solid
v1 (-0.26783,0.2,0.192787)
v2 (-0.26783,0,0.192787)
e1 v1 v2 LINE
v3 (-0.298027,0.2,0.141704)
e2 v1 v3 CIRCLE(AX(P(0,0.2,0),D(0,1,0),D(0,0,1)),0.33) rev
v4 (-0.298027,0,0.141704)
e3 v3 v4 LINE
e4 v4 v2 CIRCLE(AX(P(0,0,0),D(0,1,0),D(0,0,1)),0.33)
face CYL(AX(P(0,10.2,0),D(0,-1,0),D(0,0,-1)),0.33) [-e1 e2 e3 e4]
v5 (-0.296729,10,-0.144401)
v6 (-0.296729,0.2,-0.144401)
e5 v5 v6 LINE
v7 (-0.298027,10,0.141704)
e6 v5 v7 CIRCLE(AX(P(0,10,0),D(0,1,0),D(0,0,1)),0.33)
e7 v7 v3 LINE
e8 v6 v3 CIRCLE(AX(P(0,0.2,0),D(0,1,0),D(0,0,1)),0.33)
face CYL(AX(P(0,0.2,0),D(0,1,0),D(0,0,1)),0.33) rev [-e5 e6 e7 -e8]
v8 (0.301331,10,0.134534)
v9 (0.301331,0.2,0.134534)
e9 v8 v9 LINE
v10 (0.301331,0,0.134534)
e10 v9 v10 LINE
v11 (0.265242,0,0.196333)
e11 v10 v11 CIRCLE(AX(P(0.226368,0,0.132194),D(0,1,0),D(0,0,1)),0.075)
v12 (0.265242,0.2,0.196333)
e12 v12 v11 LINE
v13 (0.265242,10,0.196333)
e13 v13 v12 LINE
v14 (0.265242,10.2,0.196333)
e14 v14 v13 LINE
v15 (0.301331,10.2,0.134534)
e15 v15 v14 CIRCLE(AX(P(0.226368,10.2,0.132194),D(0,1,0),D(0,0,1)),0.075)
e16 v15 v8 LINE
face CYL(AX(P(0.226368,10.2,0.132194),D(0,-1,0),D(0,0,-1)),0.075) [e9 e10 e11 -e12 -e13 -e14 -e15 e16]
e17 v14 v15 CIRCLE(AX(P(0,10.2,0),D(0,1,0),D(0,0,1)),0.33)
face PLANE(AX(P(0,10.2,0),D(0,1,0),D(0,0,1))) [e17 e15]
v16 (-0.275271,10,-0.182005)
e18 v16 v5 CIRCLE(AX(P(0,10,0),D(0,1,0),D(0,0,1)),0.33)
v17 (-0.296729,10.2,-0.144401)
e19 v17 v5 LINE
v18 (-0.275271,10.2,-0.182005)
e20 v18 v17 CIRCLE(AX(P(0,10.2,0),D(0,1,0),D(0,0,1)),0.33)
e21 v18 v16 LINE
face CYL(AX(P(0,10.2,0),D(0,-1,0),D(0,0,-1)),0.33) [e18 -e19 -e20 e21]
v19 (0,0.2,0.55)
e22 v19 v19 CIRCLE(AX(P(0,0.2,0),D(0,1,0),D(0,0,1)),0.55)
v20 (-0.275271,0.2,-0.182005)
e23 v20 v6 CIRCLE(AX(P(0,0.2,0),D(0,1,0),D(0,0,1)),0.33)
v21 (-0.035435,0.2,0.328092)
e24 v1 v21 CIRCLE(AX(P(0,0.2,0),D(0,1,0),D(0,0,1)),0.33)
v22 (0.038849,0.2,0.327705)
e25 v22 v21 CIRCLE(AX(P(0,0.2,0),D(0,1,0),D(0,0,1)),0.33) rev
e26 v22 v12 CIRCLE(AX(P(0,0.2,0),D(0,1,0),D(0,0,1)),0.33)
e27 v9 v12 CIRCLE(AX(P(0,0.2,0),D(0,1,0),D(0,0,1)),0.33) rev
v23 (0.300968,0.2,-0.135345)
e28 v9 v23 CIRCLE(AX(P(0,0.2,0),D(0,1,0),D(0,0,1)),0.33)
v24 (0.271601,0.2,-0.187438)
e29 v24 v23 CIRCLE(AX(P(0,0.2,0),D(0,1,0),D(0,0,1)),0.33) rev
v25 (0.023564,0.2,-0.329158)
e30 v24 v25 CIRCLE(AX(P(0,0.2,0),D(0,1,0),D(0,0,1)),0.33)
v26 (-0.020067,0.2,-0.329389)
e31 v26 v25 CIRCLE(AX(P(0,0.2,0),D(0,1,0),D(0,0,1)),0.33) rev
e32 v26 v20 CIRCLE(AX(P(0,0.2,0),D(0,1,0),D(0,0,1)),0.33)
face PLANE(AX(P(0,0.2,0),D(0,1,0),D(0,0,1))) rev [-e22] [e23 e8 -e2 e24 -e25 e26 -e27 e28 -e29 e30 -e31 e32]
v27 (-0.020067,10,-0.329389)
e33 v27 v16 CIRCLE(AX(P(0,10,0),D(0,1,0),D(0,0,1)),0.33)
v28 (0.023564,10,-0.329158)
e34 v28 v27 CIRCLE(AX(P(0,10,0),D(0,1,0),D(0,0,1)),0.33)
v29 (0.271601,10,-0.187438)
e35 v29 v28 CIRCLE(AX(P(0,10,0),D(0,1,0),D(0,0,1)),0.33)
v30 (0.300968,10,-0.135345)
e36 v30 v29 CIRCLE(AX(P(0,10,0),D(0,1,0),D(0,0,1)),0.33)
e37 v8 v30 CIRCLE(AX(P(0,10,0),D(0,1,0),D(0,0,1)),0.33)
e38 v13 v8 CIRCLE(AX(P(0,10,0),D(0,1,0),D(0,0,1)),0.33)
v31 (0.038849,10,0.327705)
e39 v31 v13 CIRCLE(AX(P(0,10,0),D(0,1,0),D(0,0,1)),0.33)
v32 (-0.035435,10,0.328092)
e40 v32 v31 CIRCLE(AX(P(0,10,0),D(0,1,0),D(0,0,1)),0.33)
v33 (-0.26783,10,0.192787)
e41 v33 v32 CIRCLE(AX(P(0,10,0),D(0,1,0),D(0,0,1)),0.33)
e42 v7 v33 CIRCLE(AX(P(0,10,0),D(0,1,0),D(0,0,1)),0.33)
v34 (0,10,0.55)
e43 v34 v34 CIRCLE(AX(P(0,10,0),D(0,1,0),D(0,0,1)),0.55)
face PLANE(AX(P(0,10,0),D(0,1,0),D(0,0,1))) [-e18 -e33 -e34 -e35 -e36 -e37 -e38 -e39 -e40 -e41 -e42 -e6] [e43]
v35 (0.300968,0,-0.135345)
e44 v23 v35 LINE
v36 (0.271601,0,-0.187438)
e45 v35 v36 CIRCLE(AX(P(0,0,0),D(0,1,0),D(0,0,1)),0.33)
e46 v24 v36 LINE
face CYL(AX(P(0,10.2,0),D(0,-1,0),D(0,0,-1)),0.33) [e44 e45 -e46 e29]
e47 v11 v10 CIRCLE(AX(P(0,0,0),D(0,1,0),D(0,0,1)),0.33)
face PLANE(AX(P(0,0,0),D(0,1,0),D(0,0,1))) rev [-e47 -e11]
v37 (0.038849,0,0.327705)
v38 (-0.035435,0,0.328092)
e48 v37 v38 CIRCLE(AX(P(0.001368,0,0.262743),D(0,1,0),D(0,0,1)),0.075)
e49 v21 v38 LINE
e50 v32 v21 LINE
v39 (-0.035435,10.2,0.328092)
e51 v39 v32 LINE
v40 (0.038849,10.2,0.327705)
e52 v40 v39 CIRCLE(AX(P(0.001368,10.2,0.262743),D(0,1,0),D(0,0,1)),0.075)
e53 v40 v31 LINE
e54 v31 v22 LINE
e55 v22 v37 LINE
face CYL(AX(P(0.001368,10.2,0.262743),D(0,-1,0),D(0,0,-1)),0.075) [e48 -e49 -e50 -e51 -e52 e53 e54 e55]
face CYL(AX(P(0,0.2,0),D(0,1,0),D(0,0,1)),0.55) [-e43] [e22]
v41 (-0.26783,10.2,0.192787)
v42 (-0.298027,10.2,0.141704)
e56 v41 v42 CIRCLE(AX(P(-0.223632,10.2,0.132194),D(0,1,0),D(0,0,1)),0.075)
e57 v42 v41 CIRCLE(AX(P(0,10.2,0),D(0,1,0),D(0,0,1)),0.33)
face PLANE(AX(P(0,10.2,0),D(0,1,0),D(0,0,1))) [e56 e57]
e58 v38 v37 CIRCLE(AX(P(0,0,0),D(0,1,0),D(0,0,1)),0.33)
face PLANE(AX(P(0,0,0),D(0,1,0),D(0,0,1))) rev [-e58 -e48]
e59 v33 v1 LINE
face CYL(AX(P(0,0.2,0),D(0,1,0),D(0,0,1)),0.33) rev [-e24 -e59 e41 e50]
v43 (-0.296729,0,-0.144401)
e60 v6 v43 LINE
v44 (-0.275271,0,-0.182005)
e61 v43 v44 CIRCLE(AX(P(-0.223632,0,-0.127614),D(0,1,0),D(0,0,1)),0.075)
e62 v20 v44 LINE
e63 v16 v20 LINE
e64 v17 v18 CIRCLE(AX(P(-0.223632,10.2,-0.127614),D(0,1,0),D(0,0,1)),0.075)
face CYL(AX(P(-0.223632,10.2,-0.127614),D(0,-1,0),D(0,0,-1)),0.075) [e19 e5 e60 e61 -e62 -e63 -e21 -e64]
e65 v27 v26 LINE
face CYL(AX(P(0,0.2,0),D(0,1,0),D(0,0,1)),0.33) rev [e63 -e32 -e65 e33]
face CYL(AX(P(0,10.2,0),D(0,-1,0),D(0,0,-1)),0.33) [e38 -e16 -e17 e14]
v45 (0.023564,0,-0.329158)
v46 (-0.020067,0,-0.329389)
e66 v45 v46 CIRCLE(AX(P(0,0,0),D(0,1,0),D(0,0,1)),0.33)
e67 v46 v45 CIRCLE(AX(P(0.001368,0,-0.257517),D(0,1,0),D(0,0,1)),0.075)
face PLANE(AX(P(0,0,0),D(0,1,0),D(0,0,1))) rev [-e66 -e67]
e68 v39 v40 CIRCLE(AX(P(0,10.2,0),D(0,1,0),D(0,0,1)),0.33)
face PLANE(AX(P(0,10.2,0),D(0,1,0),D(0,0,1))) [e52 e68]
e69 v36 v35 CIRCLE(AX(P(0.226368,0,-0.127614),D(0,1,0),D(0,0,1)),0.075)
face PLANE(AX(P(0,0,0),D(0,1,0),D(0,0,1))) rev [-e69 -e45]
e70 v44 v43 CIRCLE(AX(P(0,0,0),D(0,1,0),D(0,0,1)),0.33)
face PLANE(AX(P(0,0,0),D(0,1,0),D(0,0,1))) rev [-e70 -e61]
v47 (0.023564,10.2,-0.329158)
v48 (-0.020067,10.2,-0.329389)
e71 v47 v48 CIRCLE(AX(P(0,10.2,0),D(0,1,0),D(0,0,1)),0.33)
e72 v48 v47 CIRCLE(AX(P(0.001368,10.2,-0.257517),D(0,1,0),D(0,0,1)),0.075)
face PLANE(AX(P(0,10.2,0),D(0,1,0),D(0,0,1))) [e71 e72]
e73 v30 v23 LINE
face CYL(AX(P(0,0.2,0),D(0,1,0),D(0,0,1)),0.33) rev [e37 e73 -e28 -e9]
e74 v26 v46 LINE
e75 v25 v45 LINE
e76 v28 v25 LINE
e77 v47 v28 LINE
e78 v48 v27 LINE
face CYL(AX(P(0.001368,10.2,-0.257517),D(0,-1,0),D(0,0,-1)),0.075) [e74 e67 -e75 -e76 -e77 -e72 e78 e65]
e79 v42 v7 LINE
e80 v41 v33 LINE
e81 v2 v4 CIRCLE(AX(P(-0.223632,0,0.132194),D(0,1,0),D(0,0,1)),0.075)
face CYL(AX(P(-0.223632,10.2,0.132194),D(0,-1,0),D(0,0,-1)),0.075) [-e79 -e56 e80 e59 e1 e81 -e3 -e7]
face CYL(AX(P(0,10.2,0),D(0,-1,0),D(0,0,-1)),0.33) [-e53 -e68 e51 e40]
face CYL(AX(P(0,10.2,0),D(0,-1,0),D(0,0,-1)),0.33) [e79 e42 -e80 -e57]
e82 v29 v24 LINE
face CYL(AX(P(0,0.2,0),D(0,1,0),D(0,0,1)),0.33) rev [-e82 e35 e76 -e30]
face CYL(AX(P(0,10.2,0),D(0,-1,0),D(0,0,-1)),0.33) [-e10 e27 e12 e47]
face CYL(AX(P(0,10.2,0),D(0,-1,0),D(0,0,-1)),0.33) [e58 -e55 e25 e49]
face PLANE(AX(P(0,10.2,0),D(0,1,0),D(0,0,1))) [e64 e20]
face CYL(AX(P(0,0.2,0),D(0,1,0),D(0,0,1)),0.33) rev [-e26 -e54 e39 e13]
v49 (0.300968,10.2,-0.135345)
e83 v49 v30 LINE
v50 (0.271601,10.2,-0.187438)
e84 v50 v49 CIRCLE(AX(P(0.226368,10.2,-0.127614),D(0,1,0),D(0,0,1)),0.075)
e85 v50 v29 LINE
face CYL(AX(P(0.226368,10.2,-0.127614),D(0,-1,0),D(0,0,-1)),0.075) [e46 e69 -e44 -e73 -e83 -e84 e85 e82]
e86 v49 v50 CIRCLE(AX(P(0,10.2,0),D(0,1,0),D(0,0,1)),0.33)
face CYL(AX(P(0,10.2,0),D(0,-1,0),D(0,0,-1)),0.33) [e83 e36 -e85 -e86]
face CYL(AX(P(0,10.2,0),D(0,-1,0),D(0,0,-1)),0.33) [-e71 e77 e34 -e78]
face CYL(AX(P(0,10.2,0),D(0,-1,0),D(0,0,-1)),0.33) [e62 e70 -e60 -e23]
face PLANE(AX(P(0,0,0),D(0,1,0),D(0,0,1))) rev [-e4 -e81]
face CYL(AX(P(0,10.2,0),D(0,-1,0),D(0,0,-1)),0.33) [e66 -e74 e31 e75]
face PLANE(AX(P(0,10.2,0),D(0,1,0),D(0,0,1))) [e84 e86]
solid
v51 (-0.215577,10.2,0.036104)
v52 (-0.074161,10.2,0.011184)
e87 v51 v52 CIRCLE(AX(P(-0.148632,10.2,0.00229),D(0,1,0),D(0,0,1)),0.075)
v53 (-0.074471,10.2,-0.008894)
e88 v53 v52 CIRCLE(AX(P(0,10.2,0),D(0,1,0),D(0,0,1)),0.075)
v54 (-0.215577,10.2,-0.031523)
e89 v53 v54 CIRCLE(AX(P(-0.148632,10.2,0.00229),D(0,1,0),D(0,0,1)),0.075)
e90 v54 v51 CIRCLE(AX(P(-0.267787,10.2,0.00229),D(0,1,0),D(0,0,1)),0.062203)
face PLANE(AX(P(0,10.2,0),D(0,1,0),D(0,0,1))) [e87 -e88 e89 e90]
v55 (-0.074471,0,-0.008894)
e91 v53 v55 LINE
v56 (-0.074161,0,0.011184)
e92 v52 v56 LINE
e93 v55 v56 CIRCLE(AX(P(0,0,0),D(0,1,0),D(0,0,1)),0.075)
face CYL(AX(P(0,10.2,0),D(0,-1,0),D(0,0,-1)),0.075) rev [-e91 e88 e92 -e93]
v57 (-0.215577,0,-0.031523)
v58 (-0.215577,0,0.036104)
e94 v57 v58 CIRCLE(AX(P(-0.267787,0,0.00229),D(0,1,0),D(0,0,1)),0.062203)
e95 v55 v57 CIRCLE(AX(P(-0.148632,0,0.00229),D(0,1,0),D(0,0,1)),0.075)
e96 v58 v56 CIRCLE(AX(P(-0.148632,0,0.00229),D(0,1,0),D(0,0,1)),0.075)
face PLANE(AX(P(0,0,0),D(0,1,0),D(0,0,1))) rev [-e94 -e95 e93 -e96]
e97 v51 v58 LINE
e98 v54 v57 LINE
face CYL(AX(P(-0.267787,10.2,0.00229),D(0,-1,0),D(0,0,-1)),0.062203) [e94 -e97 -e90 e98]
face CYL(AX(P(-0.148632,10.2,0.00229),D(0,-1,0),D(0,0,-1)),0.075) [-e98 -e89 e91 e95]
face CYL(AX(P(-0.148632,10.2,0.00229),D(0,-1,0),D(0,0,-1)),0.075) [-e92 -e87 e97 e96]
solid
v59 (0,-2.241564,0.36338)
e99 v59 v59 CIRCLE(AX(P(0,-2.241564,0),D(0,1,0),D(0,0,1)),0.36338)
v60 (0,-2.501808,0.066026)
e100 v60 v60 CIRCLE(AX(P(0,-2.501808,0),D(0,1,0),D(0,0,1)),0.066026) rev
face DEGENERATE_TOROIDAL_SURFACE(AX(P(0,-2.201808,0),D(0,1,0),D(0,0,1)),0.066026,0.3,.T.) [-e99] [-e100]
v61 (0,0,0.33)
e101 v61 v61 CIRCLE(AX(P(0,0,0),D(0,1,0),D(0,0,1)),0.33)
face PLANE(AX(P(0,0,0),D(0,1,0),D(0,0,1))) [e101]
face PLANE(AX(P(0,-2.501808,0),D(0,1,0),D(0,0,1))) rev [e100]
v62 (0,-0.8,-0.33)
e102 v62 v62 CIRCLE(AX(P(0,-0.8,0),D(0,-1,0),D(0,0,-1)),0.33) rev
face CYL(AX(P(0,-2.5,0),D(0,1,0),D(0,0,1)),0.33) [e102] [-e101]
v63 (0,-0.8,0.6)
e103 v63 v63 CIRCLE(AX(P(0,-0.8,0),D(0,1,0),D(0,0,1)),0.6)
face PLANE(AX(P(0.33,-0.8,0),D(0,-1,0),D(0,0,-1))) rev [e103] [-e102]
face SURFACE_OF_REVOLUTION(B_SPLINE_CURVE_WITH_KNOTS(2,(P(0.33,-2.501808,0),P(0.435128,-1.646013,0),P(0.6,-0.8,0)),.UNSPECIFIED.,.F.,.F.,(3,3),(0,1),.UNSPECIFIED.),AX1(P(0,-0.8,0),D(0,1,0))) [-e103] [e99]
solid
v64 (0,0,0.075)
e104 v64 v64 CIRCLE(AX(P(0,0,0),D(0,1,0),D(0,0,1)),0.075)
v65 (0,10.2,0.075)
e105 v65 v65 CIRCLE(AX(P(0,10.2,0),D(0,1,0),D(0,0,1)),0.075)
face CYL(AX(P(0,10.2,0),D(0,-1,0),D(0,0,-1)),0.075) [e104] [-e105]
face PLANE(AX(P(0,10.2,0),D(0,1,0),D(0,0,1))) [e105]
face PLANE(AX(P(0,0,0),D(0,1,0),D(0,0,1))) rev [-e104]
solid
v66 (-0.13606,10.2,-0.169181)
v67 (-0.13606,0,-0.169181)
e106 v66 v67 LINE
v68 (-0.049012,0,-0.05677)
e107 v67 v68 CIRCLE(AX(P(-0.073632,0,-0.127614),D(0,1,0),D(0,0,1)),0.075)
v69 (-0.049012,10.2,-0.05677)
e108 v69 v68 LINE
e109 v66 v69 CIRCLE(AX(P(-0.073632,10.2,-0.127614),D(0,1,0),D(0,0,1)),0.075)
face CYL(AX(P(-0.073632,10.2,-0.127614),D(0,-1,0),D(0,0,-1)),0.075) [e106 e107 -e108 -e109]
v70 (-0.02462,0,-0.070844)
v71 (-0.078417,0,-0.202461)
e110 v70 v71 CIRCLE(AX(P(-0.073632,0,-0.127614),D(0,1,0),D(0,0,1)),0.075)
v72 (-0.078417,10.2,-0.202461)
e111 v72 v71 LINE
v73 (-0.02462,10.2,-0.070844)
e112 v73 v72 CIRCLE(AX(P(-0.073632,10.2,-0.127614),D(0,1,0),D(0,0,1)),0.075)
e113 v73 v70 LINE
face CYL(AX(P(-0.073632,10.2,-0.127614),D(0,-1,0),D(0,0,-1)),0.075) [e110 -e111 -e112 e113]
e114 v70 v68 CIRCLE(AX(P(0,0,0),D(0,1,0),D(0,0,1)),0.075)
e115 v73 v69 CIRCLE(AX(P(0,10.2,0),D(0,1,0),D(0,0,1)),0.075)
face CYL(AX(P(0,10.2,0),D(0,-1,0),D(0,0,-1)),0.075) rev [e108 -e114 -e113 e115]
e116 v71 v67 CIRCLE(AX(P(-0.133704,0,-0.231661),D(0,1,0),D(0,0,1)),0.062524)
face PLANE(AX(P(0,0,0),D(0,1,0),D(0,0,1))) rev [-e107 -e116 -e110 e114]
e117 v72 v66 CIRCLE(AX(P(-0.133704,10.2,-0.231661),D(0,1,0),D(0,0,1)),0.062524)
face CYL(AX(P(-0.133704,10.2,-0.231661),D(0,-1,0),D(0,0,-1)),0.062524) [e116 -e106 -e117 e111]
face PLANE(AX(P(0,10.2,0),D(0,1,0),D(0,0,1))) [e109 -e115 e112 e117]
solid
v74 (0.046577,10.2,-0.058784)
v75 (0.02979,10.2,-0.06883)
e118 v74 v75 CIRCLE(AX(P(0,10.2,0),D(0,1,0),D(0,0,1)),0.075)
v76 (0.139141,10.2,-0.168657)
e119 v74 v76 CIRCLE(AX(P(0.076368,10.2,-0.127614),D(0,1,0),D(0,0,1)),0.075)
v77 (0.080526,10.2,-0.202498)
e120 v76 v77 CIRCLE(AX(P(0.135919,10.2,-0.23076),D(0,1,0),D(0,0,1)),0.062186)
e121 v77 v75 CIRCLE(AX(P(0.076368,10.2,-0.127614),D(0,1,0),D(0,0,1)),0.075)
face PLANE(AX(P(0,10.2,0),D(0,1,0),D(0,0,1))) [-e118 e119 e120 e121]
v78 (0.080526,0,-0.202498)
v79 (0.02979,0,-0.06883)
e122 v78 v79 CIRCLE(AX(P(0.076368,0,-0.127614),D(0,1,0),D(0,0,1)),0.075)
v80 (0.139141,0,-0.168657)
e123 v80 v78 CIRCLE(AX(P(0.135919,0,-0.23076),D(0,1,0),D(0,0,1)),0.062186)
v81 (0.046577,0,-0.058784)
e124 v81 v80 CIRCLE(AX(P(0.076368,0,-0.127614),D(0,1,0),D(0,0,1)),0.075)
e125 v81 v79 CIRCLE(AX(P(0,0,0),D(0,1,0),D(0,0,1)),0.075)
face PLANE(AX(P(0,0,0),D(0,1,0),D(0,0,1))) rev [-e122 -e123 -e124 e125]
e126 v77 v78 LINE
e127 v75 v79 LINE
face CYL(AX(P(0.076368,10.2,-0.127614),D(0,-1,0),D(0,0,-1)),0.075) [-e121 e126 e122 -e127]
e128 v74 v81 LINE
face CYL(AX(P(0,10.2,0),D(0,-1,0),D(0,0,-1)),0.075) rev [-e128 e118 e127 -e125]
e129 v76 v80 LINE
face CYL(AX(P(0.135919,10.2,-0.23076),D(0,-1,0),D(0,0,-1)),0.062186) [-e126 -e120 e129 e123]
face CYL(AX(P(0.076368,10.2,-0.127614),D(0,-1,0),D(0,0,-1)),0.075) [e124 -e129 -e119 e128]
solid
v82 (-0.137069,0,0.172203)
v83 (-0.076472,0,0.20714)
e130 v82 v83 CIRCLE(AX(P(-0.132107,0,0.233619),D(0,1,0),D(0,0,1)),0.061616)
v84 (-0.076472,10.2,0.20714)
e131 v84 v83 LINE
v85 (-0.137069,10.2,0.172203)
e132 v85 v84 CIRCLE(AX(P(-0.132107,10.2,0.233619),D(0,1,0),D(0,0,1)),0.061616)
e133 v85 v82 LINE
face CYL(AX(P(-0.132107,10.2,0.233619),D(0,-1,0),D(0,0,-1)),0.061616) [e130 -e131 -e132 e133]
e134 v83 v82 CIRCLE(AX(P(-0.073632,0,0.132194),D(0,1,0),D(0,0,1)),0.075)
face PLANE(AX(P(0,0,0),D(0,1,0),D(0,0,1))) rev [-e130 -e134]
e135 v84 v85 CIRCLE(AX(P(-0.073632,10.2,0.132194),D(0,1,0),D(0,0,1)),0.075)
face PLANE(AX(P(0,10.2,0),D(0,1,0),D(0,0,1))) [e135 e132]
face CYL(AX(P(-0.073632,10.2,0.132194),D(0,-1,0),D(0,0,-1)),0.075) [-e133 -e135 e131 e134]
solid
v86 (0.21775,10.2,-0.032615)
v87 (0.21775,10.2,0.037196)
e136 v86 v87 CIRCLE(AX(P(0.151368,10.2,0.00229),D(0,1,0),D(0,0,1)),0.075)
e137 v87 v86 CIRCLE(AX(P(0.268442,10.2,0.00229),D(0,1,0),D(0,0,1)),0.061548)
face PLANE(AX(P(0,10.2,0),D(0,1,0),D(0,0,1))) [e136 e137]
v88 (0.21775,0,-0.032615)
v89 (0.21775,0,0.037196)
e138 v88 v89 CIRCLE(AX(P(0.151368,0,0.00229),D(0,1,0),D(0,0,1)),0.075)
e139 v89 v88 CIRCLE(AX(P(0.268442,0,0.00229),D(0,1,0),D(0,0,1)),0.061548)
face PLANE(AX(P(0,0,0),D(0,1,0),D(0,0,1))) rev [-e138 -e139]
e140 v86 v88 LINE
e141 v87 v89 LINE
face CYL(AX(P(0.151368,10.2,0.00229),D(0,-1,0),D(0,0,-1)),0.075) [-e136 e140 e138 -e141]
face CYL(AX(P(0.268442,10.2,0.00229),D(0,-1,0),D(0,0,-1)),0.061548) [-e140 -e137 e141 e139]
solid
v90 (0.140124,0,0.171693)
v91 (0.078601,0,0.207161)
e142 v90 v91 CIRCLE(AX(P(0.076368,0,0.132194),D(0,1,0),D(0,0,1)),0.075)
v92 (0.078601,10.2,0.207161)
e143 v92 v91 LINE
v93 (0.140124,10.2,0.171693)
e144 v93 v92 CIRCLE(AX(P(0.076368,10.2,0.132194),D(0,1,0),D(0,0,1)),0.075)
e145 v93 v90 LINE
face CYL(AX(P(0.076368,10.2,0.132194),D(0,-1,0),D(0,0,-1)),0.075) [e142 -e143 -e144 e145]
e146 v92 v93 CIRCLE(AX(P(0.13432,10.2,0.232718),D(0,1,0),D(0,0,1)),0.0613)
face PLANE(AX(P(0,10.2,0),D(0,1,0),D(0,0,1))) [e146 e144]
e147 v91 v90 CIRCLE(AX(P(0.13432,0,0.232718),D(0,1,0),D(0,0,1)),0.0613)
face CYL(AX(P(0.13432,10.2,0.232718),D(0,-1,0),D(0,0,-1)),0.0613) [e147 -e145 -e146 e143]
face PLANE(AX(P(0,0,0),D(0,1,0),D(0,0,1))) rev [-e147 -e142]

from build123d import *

# Parameters (mm, degrees)
EXTRUDE_2_OUTLINE_R  = 0.075
EXTRUDE_2_DEPTH      = 10.2
EXTRUDE_2_2_DEPTH    = 10.2
EXTRUDE_2_3_DEPTH    = 10.2
EXTRUDE_2_4_DEPTH    = 10.2
EXTRUDE_2_5_DEPTH    = 10.2
EXTRUDE_2_6_DEPTH    = 10.2
EXTRUDE_2_7_DEPTH    = 10.2
EXTRUDE_2_8_DEPTH    = 10.2
EXTRUDE_2_9_DEPTH    = 10.2
EXTRUDE_2_10_DEPTH   = 10.2
EXTRUDE_2_11_DEPTH   = 10.2
EXTRUDE_2_12_DEPTH   = 10.2
EXTRUDE_2_13_DEPTH   = 10.2
EXTRUDE_5_DEPTH      = 2.5
EXTRUDE_6_DEPTH      = 9
EXTRUDE_6_DEPTH_BACK = 0.8
EXTRUDE_6_START      = 1
SKETCH_3_R           = 0.55
SKETCH_3_R_2         = 0.33
FILLET_3_R           = 0.3


# Read off the part's stored shape, not the designer's step: Бобышка-Вытянуть2
with BuildPart() as part:
    # Бобышка-Вытянуть2 outline → Бобышка-Вытянуть2 (new body)
    with BuildSketch(Plane(origin=(0, 0, 0), x_dir=(1, 0, 0), z_dir=(0, 1, 0))):
        Circle(EXTRUDE_2_OUTLINE_R)
    extrude(amount=EXTRUDE_2_DEPTH)


with BuildPart() as body_2:
    # Extrude 2 2 outline → Extrude 2 2 (new body)
    with BuildSketch(Plane(origin=(0, 0, 0), x_dir=(1, 0, 0), z_dir=(0, 1, 0))):
        with BuildLine():
            ThreePointArc((-0.215577435, 0.031523255), (-0.329990207, -0.00229018), (-0.215577435, -0.036103616))
            ThreePointArc((-0.215577435, -0.036103616), (-0.135616584, -0.076152155), (-0.074161469, -0.011183762))
            ThreePointArc((-0.074161469, -0.011183762), (-0.074991098, -0.00115549), (-0.074470828, 0.008893581))
            ThreePointArc((-0.074470828, 0.008893581), (-0.136756085, 0.071763554), (-0.215577435, 0.031523255))
        make_face()
    extrude(amount=EXTRUDE_2_2_DEPTH)



with BuildPart() as body_3:
    # Extrude 2 3 outline → Extrude 2 3 (new body)
    with BuildSketch(Plane(origin=(0, 0, 0), x_dir=(1, 0, 0), z_dir=(0, 1, 0))):
        with BuildLine():
            ThreePointArc((-0.078416857, 0.202460861), (-0.164965898, 0.285808068), (-0.13605962, 0.169180796))
            ThreePointArc((-0.13605962, 0.169180796), (-0.132931564, 0.081694169), (-0.049012134, 0.056769805))
            ThreePointArc((-0.049012134, 0.056769805), (-0.03748264, 0.064961925), (-0.024620163, 0.070843825))
            ThreePointArc((-0.024620163, 0.070843825), (-0.004207657, 0.155990018), (-0.078416857, 0.202460861))
        make_face()
    extrude(amount=EXTRUDE_2_3_DEPTH)


with BuildPart() as body_4:
    # Extrude 2 4 outline → Extrude 2 4 (new body)
    with BuildSketch(Plane(origin=(0, 0, 0), x_dir=(1, 0, 0), z_dir=(0, 1, 0))):
        with BuildLine():
            ThreePointArc((0.139140572, 0.168657106), (0.167012389, 0.284614831), (0.080525962, 0.202498267))
            ThreePointArc((0.080525962, 0.202498267), (0.006248792, 0.154228257), (0.029790206, 0.068829817))
            ThreePointArc((0.029790206, 0.068829817), (0.038512817, 0.06435653), (0.046577497, 0.058783813))
            ThreePointArc((0.046577497, 0.058783813), (0.133726217, 0.079291783), (0.139140572, 0.168657106))
        make_face()
    extrude(amount=EXTRUDE_2_4_DEPTH)


with BuildPart() as body_5:
    # Extrude 2 5 outline → Extrude 2 5 (new body)
    with BuildSketch(Plane(origin=(0, 0, 0), x_dir=(1, 0, 0), z_dir=(0, 1, 0))):
        with BuildLine():
            ThreePointArc((0.217749972, -0.037195687), (0.329990231, -0.002290181), (0.217749972, 0.032615326))
            ThreePointArc((0.217749972, 0.032615326), (0.076367703, -0.00229018), (0.217749972, -0.037195687))
        make_face()
    extrude(amount=EXTRUDE_2_5_DEPTH)


with BuildPart() as body_6:
    # Extrude 2 6 outline → Extrude 2 6 (new body)
    with BuildSketch(Plane(origin=(0, 0, 0), x_dir=(1, 0, 0), z_dir=(0, 1, 0))):
        with BuildLine():
            ThreePointArc((0.078601287, -0.207160724), (0.164936529, -0.285825011), (0.140123873, -0.171692736))
            ThreePointArc((0.140123873, -0.171692736), (0.038908974, -0.067218275), (0.078601287, -0.207160724))
        make_face()
    extrude(amount=EXTRUDE_2_6_DEPTH)


with BuildPart() as body_7:
    # Extrude 2 7 outline → Extrude 2 7 (new body)
    with BuildSketch(Plane(origin=(0, 0, 0), x_dir=(1, 0, 0), z_dir=(0, 1, 0))):
        with BuildLine():
            ThreePointArc((-0.137069196, -0.172203487), (-0.162882691, -0.286998397), (-0.076471576, -0.207140228))
            ThreePointArc((-0.076471576, -0.207140228), (-0.036171958, -0.067219203), (-0.137069196, -0.172203487))
        make_face()
    extrude(amount=EXTRUDE_2_7_DEPTH)


with BuildPart() as body_8:
    # Extrude 2 8 outline → Extrude 2 8 (new body)
    with BuildSketch(Plane(origin=(0, 0, 0), x_dir=(1, 0, 0), z_dir=(0, 1, 0))):
        with BuildLine():
            ThreePointArc((-0.296729349, 0.144401155), (-0.158491958, 0.090441918), (-0.275270897, 0.182005311))
            ThreePointArc((-0.275270897, 0.182005311), (-0.286617495, 0.163555531), (-0.296729349, 0.144401155))
        make_face()
    extrude(amount=EXTRUDE_2_8_DEPTH)


with BuildPart() as body_9:
    # Extrude 2 9 outline → Extrude 2 9 (new body)
    with BuildSketch(Plane(origin=(0, 0, 0), x_dir=(1, 0, 0), z_dir=(0, 1, 0))):
        with BuildLine():
            ThreePointArc((-0.267830407, -0.192787118), (-0.159068831, -0.0940291), (-0.29802696, -0.141703673))
            ThreePointArc((-0.29802696, -0.141703673), (-0.284079249, -0.16792552), (-0.267830407, -0.192787118))
        make_face()
    extrude(amount=EXTRUDE_2_9_DEPTH)


with BuildPart() as body_10:
    # Extrude 2 10 outline → Extrude 2 10 (new body)
    with BuildSketch(Plane(origin=(0, 0, 0), x_dir=(1, 0, 0), z_dir=(0, 1, 0))):
        with BuildLine():
            ThreePointArc((-0.020066658, 0.329389328), (0.000969374, 0.182518498), (0.023564272, 0.329157599))
            ThreePointArc((0.023564272, 0.329157599), (0.001752641, 0.329995346), (-0.020066658, 0.329389328))
        make_face()
    extrude(amount=EXTRUDE_2_10_DEPTH)


with BuildPart() as body_11:
    # Extrude 2 11 outline → Extrude 2 11 (new body)
    with BuildSketch(Plane(origin=(0, 0, 0), x_dir=(1, 0, 0), z_dir=(0, 1, 0))):
        with BuildLine():
            ThreePointArc((0.038848965, -0.327705291), (0.000977296, -0.187743587), (-0.03543522, -0.328091977))
            ThreePointArc((-0.03543522, -0.328091977), (0.001717788, -0.329995529), (0.038848965, -0.327705291))
        make_face()
    extrude(amount=EXTRUDE_2_11_DEPTH)


with BuildPart() as body_12:
    # Extrude 2 12 outline → Extrude 2 12 (new body)
    with BuildSketch(Plane(origin=(0, 0, 0), x_dir=(1, 0, 0), z_dir=(0, 1, 0))):
        with BuildLine():
            ThreePointArc((0.301331175, -0.134534467), (0.161602494, -0.094372467), (0.265242363, -0.196332597))
            ThreePointArc((0.265242363, -0.196332597), (0.284966921, -0.166414705), (0.301331175, -0.134534467))
        make_face()
    extrude(amount=EXTRUDE_2_12_DEPTH)


with BuildPart() as body_13:
    # Extrude 2 13 outline → Extrude 2 13 (new body)
    with BuildSketch(Plane(origin=(0, 0, 0), x_dir=(1, 0, 0), z_dir=(0, 1, 0))):
        with BuildLine():
            ThreePointArc((0.271600665, 0.1874382), (0.16103432, 0.090782272), (0.300968191, 0.135344552))
            ThreePointArc((0.300968191, 0.135344552), (0.287466887, 0.162057981), (0.271600665, 0.1874382))
        make_face()
    extrude(amount=EXTRUDE_2_13_DEPTH)


with BuildPart() as body_14:
    # Эскиз2 → Бобышка-Вытянуть5 (new body)
    with BuildSketch(Plane(origin=(0, 0, 0), x_dir=(1, 0, 0), z_dir=(0, 1, 0))):
        with BuildLine():
            ThreePointArc((-0.020066658, 0.329389328), (-0.165035087, 0.285768123), (-0.275270897, 0.182005311))
            ThreePointArc((-0.275270897, 0.182005311), (-0.286617495, 0.163555531), (-0.296729349, 0.144401155))
            ThreePointArc((-0.296729349, 0.144401155), (-0.329996606, 0.00149668), (-0.29802696, -0.141703673))
            ThreePointArc((-0.29802696, -0.141703673), (-0.284079249, -0.16792552), (-0.267830407, -0.192787118))
            ThreePointArc((-0.267830407, -0.192787118), (-0.166040241, -0.285185271), (-0.03543522, -0.328091977))
            ThreePointArc((-0.03543522, -0.328091977), (0.001717788, -0.329995529), (0.038848965, -0.327705291))
            ThreePointArc((0.038848965, -0.327705291), (0.165627836, -0.285424981), (0.265242363, -0.196332597))
            ThreePointArc((0.265242363, -0.196332597), (0.284966921, -0.166414705), (0.301331175, -0.134534467))
            ThreePointArc((0.301331175, -0.134534467), (0.322753225, -0.068777584), (0.33, 0))
            ThreePointArc((0.33, 0), (0.322660428, 0.069211621), (0.300968191, 0.135344552))
            ThreePointArc((0.300968191, 0.135344552), (0.287466887, 0.162057981), (0.271600665, 0.1874382))
            ThreePointArc((0.271600665, 0.1874382), (0.163712193, 0.28652804), (0.023564272, 0.329157599))
            ThreePointArc((0.023564272, 0.329157599), (0.001752641, 0.329995346), (-0.020066658, 0.329389328))
        make_face()
    extrude(amount=-EXTRUDE_5_DEPTH)

    # Эскиз5 → Повернуть1 (revolve)
    with BuildSketch(Plane(origin=(0, 0, 0), x_dir=(-1, 0, 0), z_dir=(0, 0, 1)), mode=Mode.PRIVATE) as revolve_1_sk:
        with BuildLine():
            Line((-0.33, 0.8), (-0.6, 0.8))
            add(Edge.make_bspline(
                [(-0.33, 2.501807797), (-0.435127833, 1.646013076), (-0.6, 0.8)],
                knots=[0, 0, 0, 1, 1, 1], degree=2))
            Line((-0.33, 2.501807797), (0, 2.501807797))
            Line((0, 2.501807797), (0, 0.8))
            Line((0, 0.8), (-0.33, 0.8))
        make_face()
    revolve(revolve_1_sk.sketch.rotate(Axis((0, -0.8, 0), (0, -1, 0)), 90), axis=Axis((0, -0.8, 0), (0, -1, 0)))

    # Скругление3
    fillet_3_edges = [body_14.edges().sort_by_distance(p)[0] for p in [
        (0, -2.501807797, -0.33),
    ]]
    fillet(fillet_3_edges, radius=FILLET_3_R)


with BuildPart() as body_2_1:
    add(body_2.part)

    add(body_3.part)  # Бобышка-Вытянуть6 merges body 3

    add(body_4.part)  # Бобышка-Вытянуть6 merges body 4

    add(body_5.part)  # Бобышка-Вытянуть6 merges body 5

    add(body_6.part)  # Бобышка-Вытянуть6 merges body 6

    add(body_7.part)  # Бобышка-Вытянуть6 merges body 7

    add(body_8.part)  # Бобышка-Вытянуть6 merges body 8

    add(body_9.part)  # Бобышка-Вытянуть6 merges body 9

    add(body_10.part)  # Бобышка-Вытянуть6 merges body 10

    add(body_11.part)  # Бобышка-Вытянуть6 merges body 11

    add(body_12.part)  # Бобышка-Вытянуть6 merges body 12

    add(body_13.part)  # Бобышка-Вытянуть6 merges body 13
    # Эскиз3 → Бобышка-Вытянуть6 (add, two sides: drawn at the far end of the back side and taken through both)
    with BuildSketch(Plane(origin=(0, 0, 0), x_dir=(1, 0, 0), z_dir=(0, 1, 0)).offset(EXTRUDE_6_START - EXTRUDE_6_DEPTH_BACK)):
        with Locations(Location((0, 0, 0), (0, 0, 270))):
            Circle(SKETCH_3_R)
        with Locations(Location((0, 0, 0), (0, 0, 270))):
            Circle(SKETCH_3_R_2, mode=Mode.SUBTRACT)
    extrude(amount=EXTRUDE_6_DEPTH + EXTRUDE_6_DEPTH_BACK)


solid = Compound([part.part, body_14.part, body_2_1.part])
